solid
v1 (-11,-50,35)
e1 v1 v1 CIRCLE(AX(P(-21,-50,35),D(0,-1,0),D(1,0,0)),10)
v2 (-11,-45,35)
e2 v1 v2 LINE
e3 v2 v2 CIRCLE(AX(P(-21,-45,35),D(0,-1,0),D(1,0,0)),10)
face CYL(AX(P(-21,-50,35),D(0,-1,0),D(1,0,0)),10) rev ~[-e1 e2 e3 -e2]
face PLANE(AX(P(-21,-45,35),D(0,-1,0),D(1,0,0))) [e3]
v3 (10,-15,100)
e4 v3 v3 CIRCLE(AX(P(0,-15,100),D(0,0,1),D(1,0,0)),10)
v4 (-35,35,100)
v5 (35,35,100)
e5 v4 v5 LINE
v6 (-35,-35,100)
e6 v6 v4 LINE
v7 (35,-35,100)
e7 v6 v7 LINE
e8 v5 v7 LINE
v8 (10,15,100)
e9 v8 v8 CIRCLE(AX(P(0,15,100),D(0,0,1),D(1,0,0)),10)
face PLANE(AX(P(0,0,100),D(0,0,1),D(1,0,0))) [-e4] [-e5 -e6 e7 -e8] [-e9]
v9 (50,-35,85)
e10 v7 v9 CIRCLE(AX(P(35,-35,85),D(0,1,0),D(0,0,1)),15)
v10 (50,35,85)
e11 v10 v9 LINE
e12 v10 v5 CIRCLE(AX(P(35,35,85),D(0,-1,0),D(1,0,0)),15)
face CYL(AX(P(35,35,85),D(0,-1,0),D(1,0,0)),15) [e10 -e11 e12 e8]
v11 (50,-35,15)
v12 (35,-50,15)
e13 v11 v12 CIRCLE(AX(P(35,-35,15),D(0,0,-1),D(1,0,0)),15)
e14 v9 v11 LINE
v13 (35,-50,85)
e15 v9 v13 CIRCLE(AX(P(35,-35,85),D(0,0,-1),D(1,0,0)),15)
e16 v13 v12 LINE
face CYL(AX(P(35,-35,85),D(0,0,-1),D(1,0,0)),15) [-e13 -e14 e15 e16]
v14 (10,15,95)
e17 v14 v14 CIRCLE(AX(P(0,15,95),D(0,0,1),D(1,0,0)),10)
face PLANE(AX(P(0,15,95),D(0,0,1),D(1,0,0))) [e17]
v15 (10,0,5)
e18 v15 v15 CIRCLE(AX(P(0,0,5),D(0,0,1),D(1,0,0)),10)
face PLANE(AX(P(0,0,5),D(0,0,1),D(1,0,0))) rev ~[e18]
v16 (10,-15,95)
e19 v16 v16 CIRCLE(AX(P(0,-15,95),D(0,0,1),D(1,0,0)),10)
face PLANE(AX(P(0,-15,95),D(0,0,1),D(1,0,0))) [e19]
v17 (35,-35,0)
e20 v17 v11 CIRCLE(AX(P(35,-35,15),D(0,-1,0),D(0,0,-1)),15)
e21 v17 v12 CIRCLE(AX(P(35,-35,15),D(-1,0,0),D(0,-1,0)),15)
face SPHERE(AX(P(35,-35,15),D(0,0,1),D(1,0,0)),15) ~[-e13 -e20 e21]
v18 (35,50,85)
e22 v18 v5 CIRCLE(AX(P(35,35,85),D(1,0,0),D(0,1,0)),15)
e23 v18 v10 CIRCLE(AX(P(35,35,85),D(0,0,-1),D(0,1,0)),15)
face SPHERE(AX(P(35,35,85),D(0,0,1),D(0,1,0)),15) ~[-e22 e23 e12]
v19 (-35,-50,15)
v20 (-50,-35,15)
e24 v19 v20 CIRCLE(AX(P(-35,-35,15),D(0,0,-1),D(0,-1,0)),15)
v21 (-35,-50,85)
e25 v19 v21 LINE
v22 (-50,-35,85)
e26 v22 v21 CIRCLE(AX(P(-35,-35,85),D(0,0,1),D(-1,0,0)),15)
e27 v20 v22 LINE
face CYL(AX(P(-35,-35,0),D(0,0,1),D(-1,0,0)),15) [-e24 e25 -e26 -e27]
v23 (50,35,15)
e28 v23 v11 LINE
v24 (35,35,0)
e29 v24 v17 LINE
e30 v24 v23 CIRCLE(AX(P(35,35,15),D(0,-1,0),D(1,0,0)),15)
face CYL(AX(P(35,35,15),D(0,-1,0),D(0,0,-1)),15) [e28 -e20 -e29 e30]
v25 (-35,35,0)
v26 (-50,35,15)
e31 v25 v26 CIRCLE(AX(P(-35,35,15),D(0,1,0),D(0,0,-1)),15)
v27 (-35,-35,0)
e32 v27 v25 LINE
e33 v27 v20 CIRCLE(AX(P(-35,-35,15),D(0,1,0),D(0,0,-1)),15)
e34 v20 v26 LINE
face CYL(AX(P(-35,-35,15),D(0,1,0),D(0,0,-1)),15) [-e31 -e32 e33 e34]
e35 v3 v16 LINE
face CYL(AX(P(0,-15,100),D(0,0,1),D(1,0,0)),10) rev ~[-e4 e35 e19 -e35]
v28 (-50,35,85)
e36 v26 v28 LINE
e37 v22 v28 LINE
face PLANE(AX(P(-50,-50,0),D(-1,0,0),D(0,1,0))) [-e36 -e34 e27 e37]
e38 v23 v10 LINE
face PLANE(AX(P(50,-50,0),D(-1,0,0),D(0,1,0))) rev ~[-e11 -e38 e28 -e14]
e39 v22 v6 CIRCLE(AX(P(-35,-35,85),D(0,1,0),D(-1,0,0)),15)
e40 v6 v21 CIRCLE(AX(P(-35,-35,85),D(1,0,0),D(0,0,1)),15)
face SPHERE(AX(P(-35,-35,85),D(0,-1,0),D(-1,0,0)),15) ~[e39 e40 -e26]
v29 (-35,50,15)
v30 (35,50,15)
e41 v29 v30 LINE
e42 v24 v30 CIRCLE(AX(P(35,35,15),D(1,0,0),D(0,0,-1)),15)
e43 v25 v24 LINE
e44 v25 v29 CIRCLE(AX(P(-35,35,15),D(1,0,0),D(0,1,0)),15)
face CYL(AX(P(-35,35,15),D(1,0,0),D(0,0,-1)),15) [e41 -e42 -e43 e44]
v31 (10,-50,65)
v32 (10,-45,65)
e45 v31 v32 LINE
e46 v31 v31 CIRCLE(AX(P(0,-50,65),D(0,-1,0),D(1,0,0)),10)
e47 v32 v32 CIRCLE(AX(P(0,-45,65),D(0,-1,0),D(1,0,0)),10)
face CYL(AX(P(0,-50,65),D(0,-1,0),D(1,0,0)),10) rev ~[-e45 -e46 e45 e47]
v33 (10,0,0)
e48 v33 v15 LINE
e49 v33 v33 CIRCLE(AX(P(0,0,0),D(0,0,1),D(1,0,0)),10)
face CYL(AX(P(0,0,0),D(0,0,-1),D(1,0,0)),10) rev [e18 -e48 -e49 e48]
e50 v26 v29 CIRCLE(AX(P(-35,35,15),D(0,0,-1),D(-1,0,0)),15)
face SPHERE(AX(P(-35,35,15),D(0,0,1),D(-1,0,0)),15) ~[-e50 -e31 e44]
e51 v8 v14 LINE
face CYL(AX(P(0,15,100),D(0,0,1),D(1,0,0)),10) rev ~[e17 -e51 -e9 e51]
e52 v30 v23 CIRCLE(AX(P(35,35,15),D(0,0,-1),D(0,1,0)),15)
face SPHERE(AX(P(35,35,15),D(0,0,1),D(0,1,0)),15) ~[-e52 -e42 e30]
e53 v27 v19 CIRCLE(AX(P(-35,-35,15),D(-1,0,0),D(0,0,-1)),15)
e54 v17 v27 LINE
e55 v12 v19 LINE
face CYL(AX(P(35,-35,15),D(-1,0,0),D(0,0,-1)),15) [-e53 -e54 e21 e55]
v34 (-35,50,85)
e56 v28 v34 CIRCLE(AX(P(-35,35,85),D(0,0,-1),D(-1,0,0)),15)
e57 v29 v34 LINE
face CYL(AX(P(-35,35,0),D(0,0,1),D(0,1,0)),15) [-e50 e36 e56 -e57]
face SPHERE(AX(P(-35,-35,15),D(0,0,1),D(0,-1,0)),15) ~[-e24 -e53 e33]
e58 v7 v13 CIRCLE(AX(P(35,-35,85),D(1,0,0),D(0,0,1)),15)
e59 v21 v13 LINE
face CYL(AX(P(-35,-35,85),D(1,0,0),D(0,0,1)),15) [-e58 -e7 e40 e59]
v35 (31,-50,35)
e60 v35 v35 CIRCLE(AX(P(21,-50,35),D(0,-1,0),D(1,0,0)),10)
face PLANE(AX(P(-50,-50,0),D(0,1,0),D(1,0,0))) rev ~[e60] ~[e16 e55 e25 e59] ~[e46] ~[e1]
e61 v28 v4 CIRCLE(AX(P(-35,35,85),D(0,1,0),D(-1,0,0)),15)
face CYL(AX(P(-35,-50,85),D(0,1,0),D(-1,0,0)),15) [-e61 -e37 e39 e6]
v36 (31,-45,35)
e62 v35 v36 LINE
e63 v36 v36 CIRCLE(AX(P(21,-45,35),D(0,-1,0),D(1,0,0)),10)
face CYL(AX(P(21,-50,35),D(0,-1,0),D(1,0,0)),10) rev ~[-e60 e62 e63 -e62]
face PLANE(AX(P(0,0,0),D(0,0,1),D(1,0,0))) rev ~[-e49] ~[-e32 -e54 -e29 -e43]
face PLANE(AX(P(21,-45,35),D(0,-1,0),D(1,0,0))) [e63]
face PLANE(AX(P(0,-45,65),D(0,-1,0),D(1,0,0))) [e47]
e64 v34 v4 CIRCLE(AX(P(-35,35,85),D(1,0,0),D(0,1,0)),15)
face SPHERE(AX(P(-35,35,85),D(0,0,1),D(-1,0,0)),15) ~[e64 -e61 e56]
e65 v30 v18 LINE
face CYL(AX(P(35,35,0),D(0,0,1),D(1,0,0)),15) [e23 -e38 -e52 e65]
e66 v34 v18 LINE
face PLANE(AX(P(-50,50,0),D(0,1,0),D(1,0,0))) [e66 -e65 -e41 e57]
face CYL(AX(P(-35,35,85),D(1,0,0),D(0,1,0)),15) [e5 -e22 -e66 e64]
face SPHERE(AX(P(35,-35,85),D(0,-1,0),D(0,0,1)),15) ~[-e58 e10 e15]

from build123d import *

# Parameters (mm, degrees)
F0_W      = 100
F0_H      = 100
F1_DEPTH  = 100
F2_F1_R   = 15
F2_F2_R   = 15
F2_F3_R   = 15
F2_F4_R   = 15
F2_F5_R   = 15
F4_R      = 10
F5_DEPTH  = 5
F7_R      = 10
F8_DEPTH  = 5
F9_R      = 10
F10_DEPTH = 5


# Not quite as in the source:
# - a feature of the source that left no trace in its solid (it failed there, or was rolled back) is left out


with BuildPart() as f1:
    # F0 (on Top) → F1 (new body)
    with BuildSketch(Plane.XY):
        Rectangle(F0_W, F0_H)
    extrude(amount=F1_DEPTH)

    # F2: fillet of radius 15 on 7 edges, made by hand

    # F2_f1
    f2_f1_edges = [f1.edges().sort_by_distance(p)[0] for p in [
        (50, 50, 50),
    ]]
    fillet(f2_f1_edges, radius=F2_F1_R)

    # F2_f2
    f2_f2_edges = [f1.edges().sort_by_distance(p)[0] for p in [
        (-50, 50, 50),
    ]]
    fillet(f2_f2_edges, radius=F2_F2_R)

    # F2_f3
    f2_f3_edges = [f1.edges().sort_by_distance(p)[0] for p in [
        (0, 50, 100),
    ]]
    fillet(f2_f3_edges, radius=F2_F3_R)

    # F2_f4
    f2_f4_edges = [f1.edges().sort_by_distance(p)[0] for p in [
        (-50, -50, 42.5),
    ]]
    fillet(f2_f4_edges, radius=F2_F4_R)

    # F2_f5
    f2_f5_edges = [f1.edges().sort_by_distance(p)[0] for p in [
        (-50, 0, 0),
    ]]
    fillet(f2_f5_edges, radius=F2_F5_R)

    # F4 (on Top) → F5 (cut)
    with BuildSketch(Plane.XY):
        Circle(F4_R)
    extrude(amount=F5_DEPTH, mode=Mode.SUBTRACT)

    # F7 (on face) → F8 (cut)
    with BuildSketch(Plane.XY.offset(100)):
        with Locations((0, -15)):
            Circle(F7_R)
        with Locations((0, 15)):
            Circle(F7_R)
    extrude(amount=-F8_DEPTH, mode=Mode.SUBTRACT)

    # F9 (on face) → F10 (cut)
    with BuildSketch(Plane.XZ.offset(50)):
        with Locations((0, 65)):
            Circle(F9_R)
        with Locations((-21, 35)):
            Circle(F9_R)
        with Locations((21, 35)):
            Circle(F9_R)
    extrude(amount=-F10_DEPTH, mode=Mode.SUBTRACT)


solid = f1.part
